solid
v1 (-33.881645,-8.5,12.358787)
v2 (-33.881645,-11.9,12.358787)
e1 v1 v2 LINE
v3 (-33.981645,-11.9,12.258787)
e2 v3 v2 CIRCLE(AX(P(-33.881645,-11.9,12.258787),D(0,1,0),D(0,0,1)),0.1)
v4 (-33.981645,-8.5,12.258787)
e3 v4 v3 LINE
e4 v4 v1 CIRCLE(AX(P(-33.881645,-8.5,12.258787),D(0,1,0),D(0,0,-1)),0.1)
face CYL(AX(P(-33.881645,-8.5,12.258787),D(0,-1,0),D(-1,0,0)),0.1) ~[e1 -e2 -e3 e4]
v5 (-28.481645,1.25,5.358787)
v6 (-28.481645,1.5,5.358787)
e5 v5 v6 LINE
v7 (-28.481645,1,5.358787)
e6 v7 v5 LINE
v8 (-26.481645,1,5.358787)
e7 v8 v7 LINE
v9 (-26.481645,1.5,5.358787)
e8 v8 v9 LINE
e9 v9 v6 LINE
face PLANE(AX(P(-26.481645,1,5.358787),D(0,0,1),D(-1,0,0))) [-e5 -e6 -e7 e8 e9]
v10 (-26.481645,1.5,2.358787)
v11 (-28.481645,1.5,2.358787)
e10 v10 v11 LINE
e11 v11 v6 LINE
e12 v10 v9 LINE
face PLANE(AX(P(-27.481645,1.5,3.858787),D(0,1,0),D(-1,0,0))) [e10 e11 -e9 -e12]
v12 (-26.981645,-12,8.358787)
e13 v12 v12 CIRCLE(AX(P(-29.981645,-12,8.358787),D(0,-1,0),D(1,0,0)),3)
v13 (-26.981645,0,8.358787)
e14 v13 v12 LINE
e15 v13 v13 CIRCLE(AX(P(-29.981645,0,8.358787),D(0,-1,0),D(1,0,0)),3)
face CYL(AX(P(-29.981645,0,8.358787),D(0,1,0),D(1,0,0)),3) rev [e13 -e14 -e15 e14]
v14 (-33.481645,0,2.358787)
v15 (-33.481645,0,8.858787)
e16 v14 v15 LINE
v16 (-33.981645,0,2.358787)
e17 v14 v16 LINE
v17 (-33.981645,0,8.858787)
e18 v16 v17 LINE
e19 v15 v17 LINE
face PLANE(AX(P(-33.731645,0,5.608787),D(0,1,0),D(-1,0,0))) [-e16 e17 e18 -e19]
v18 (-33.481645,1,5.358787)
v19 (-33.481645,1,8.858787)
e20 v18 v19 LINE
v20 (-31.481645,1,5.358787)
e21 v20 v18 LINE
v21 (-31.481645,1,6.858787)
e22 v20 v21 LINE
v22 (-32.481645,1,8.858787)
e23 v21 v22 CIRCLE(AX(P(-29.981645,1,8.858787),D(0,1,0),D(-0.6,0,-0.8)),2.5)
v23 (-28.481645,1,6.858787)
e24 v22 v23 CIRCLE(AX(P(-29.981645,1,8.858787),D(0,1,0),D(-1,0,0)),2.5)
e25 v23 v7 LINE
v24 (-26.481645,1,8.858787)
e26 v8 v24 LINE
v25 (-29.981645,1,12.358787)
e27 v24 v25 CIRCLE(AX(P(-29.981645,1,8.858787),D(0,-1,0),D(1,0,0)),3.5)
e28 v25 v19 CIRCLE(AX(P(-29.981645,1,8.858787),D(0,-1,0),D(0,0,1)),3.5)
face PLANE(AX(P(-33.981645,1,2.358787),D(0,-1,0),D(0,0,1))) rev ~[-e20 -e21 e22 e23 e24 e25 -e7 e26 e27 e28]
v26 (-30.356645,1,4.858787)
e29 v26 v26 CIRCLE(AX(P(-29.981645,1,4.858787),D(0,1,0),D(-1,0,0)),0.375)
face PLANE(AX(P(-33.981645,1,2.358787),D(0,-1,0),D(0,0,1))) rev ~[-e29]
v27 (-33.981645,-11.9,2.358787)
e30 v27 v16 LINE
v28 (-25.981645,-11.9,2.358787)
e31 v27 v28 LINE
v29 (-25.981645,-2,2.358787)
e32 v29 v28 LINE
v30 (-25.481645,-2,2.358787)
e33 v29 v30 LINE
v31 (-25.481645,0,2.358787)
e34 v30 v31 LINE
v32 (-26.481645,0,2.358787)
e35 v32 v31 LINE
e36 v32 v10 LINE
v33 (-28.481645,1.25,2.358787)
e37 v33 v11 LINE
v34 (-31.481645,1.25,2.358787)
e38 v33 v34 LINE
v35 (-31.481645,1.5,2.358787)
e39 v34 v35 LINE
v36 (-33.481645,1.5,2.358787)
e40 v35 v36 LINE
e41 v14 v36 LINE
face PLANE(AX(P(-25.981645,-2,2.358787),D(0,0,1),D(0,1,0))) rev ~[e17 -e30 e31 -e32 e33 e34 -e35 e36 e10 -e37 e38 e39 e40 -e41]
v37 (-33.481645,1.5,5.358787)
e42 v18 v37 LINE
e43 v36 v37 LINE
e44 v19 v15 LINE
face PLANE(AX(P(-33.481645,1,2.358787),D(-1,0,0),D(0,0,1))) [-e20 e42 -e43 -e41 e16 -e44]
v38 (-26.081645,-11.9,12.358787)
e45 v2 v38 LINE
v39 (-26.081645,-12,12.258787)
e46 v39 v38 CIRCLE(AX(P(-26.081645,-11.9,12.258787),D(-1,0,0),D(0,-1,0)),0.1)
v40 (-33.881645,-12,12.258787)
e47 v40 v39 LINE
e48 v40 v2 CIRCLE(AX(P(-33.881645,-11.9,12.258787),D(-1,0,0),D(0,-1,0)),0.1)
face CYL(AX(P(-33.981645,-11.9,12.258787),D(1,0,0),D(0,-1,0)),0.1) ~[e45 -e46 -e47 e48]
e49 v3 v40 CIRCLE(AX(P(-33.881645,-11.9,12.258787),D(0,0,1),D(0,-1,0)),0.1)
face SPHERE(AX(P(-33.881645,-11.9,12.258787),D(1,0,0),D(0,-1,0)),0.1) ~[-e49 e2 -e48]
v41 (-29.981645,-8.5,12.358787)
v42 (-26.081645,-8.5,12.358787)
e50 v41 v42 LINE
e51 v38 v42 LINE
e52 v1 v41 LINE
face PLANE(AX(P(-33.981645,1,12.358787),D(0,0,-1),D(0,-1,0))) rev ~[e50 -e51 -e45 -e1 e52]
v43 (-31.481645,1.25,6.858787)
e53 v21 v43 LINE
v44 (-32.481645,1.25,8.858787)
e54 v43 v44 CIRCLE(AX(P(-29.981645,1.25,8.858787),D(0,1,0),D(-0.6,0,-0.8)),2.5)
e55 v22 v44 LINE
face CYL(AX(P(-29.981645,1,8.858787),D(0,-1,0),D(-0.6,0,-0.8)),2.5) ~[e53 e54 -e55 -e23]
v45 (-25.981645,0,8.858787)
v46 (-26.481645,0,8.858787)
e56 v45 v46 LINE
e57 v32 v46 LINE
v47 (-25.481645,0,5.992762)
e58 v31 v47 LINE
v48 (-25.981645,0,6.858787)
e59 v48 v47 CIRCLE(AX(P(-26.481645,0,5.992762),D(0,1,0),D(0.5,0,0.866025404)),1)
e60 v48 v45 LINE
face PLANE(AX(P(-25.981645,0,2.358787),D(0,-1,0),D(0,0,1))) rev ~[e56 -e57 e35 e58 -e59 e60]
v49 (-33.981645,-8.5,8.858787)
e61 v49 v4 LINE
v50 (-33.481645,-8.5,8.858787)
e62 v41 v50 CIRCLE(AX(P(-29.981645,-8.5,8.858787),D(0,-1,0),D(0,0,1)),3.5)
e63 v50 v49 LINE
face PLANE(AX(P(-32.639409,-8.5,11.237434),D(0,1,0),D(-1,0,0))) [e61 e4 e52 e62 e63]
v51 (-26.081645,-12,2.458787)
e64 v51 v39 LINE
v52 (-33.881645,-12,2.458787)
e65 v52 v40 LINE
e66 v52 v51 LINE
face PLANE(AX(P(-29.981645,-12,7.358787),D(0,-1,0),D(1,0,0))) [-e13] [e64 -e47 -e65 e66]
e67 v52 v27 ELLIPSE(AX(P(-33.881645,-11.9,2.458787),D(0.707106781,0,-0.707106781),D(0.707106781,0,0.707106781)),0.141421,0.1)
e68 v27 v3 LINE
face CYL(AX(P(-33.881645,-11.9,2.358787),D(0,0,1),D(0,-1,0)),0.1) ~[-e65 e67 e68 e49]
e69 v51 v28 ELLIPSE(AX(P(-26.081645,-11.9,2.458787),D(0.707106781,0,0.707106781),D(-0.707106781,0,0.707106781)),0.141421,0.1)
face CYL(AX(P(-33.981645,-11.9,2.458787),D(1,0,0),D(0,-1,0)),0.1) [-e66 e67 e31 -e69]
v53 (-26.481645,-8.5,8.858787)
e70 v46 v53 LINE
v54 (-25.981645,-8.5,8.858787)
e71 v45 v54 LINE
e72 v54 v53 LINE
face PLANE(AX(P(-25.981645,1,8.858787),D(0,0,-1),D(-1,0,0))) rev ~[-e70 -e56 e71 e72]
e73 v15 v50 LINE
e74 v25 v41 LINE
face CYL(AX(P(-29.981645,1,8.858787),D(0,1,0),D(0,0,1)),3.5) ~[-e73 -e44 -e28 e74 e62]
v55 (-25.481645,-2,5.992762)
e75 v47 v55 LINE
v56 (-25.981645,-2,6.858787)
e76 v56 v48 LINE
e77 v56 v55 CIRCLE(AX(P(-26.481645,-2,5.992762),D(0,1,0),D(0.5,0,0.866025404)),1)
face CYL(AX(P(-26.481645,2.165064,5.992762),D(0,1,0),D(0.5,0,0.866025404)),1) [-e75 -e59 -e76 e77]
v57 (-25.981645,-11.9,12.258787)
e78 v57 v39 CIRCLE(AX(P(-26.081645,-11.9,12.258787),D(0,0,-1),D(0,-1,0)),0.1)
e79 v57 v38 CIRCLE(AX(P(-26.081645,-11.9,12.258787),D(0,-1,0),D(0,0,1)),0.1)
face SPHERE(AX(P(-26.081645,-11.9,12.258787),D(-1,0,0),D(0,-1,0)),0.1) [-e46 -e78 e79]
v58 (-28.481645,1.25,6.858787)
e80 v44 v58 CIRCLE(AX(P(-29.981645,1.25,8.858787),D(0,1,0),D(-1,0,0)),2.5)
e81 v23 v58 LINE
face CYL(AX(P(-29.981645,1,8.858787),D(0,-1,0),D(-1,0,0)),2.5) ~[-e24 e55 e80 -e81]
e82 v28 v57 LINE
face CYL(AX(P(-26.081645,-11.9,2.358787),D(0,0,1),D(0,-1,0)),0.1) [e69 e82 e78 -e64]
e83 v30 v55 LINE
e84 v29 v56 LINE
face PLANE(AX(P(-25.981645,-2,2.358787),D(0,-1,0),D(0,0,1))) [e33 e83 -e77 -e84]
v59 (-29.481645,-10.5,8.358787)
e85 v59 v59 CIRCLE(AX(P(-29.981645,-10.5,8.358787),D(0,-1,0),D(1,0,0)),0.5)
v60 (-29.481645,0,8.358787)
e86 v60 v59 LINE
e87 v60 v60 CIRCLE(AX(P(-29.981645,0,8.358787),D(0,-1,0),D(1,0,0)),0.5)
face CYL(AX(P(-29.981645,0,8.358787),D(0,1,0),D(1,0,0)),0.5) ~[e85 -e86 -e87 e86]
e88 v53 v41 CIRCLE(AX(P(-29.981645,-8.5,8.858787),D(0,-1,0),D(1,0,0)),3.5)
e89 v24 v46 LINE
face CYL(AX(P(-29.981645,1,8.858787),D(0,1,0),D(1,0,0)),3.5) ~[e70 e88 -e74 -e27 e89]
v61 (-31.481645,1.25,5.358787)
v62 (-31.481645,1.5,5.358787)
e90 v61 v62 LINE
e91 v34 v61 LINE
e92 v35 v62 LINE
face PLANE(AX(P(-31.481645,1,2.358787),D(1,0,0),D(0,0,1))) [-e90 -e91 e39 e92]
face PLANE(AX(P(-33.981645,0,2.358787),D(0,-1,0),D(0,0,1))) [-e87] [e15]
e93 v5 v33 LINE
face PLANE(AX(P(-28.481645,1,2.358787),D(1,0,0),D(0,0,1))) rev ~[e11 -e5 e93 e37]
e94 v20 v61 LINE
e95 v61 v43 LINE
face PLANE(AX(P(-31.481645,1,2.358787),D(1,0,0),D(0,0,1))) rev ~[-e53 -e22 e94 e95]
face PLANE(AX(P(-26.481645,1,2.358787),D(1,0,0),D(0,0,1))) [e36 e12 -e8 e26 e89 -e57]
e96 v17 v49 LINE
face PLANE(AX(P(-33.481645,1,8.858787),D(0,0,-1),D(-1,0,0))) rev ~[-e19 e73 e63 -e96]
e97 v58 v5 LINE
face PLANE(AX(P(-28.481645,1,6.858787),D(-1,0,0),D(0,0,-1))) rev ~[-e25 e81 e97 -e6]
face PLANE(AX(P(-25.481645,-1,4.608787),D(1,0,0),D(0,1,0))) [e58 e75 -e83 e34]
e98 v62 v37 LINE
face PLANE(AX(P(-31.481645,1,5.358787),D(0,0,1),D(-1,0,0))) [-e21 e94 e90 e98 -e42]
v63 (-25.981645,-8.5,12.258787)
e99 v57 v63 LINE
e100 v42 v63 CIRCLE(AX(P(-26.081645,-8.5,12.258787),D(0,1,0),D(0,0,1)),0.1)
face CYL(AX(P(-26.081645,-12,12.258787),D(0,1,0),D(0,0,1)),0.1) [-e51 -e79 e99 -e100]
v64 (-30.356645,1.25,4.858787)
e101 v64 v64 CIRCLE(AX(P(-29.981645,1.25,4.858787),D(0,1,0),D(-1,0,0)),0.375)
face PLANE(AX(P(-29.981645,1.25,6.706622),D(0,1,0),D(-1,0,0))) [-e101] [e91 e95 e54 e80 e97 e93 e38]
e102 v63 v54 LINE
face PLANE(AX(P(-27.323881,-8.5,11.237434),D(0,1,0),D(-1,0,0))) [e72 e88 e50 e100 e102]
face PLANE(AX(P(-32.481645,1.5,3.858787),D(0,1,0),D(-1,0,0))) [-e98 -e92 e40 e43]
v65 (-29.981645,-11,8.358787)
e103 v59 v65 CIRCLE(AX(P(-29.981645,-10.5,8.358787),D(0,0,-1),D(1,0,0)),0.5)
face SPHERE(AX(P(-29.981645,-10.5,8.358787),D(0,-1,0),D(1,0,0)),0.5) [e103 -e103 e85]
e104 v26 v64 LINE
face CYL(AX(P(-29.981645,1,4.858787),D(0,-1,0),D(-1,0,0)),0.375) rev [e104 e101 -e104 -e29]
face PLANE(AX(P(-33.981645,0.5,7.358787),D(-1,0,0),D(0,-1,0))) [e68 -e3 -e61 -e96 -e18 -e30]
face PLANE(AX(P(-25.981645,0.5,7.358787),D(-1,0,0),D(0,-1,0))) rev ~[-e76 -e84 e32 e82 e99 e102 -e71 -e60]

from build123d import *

# Parameters (mm, degrees)
F0_W         = 8
F0_H         = 10
F0_R         = 3
F1_DEPTH     = 12
F2_W         = 1
F2_H         = 10
F3_DEPTH     = 8
F5_DEPTH     = 9.5
F4_W         = 0.5
F4_H         = 6.5
F6_DEPTH     = 1
F7_R         = 0.5
F8_DEPTH     = 11
F9_R         = 0.5
F10_R        = 0.1
F11_W        = 2
F11_H        = 3
F12_DEPTH    = 0.5
F13_R        = 0.375
F14_DEPTH    = 0.25
F15_W        = 2
F15_H        = 4.5
F16_DEPTH    = 0.5
F17_T1_DEPTH = 6.3301270189


# Not quite as in the source:
# - a fillet or chamfer that OpenCascade refuses, or shapes differently, is made with other operations: its cross-section is extruded or revolved along the edge and cut away or added


with BuildPart() as f1:
    # F0 (on Front) → F1 (new body)
    with BuildSketch(Plane.XZ):
        with Locations((-29.9816446145, 7.3587873485)):
            Rectangle(F0_W, F0_H)
        with Locations((-29.9816446145, 8.3587873485)):
            Circle(F0_R, mode=Mode.SUBTRACT)
    extrude(amount=F1_DEPTH)

    # F2 (on face) → F3 (join, through all)
    with BuildSketch(Plane(origin=(-33.9816446145, 0, 0), x_dir=(0, -1, 0), z_dir=(-1, 0, 0))):
        with Locations((-0.5, 7.3587873485)):
            Rectangle(F2_W, F2_H)
    extrude(amount=-F3_DEPTH)

    # F4 (on face) → F5 (cut)
    with BuildSketch(Plane(origin=(0, 1, 0), x_dir=(-1, 0, 0), z_dir=(0, 1, 0))):
        with BuildLine():
            Line((33.9816446145, 12.3587873485), (29.9816446145, 12.3587873485))
            ThreePointArc((29.9816446145, 12.3587873485), (32.4565183487, 11.3336610826), (33.4816446145, 8.8587873485))
            Line((33.4816446145, 8.8587873485), (33.9816446145, 8.8587873485))
            Line((33.9816446145, 8.8587873485), (33.9816446145, 12.3587873485))
        make_face()
        with BuildLine():
            Line((29.9816446145, 12.3587873485), (25.9816446145, 12.3587873485))
            Line((25.9816446145, 12.3587873485), (25.9816446145, 8.8587873485))
            Line((25.9816446145, 8.8587873485), (26.4816446145, 8.8587873485))
            ThreePointArc((26.4816446145, 8.8587873485), (27.5067708804, 11.3336610826), (29.9816446145, 12.3587873485))
        make_face()
    extrude(amount=-F5_DEPTH, mode=Mode.SUBTRACT)

    # F4 (on face) → F6 (cut)
    with BuildSketch(Plane(origin=(0, 1, 0), x_dir=(-1, 0, 0), z_dir=(0, 1, 0))):
        with Locations((26.2316446145, 5.6087873485)):
            Rectangle(F4_W, F4_H)
        with Locations((33.7316446145, 5.6087873485)):
            Rectangle(F4_W, F4_H)
    extrude(amount=-F6_DEPTH, mode=Mode.SUBTRACT)

    # F7 (on face) → F8 (join)
    with BuildSketch(Plane.XZ):
        with Locations((-29.9816446145, 8.3587873485)):
            Circle(F7_R)
    extrude(amount=F8_DEPTH)

    # F9
    f9_edges = [f1.edges().sort_by_distance(p)[0] for p in [
        (-30.481645, -11, 8.358787),
    ]]
    fillet(f9_edges, radius=F9_R)

    # F10
    f10_edges = [f1.edges().sort_by_distance(p)[0] for p in [
        (-29.981645, -12, 12.358787),
        (-25.981645, -12, 7.358787),
        (-33.981645, -12, 7.358787),
        (-29.981645, -12, 2.358787),
        (-25.981645, -10.25, 12.358787),
        (-33.981645, -10.25, 12.358787),
    ]]
    fillet(f10_edges, radius=F10_R)

    # F11 (on face) → F12 (join)
    with BuildSketch(Plane(origin=(0, 1, 0), x_dir=(-1, 0, 0), z_dir=(0, 1, 0))):
        with Locations((27.4816446145, 3.8587873485)):
            Rectangle(F11_W, F11_H)
        with Locations((32.4816446145, 3.8587873485)):
            Rectangle(F11_W, F11_H)
    extrude(amount=F12_DEPTH)

    # F13 (on face) → F14 (join)
    with BuildSketch(Plane(origin=(0, 1, 0), x_dir=(-1, 0, 0), z_dir=(0, 1, 0))):
        with BuildLine():
            Line((31.4816446145, 6.8587873485), (28.4816446145, 6.8587873485))
            ThreePointArc((28.4816446145, 6.8587873485), (29.9816446145, 6.3587873485), (31.4816446145, 6.8587873485))
        make_face()
        with BuildLine():
            ThreePointArc((31.4816446145, 6.8587873485), (32.217712592, 7.7407533597), (32.4816446145, 8.8587873485))
            ThreePointArc((32.4816446145, 8.8587873485), (28.8636106257, 11.094855326), (28.4816446145, 6.8587873485))
            Line((28.4816446145, 6.8587873485), (31.4816446145, 6.8587873485))
        make_face()
        with BuildLine():
            ThreePointArc((31.4816446145, 6.8587873485), (29.9816446145, 6.3587873485), (28.4816446145, 6.8587873485))
            Line((28.4816446145, 6.8587873485), (28.4816446145, 5.3587873485))
            Line((28.4816446145, 5.3587873485), (28.4816446145, 2.3587873485))
            Line((28.4816446145, 2.3587873485), (31.4816446145, 2.3587873485))
            Line((31.4816446145, 2.3587873485), (31.4816446145, 5.3587873485))
            Line((31.4816446145, 5.3587873485), (31.4816446145, 6.8587873485))
        make_face()
        with Locations((29.9816446145, 4.8587873485)):
            Circle(F13_R, mode=Mode.SUBTRACT)
    extrude(amount=F14_DEPTH)

    # F15 (on face) → F16 (join)
    with BuildSketch(Plane.YZ.offset(-25.9816446145)):
        with Locations((-1, 4.6087873485)):
            Rectangle(F15_W, F15_H)
    extrude(amount=F16_DEPTH)

    # F17: fillet of radius 1 on 1 edges, made by hand

    # F17_s2 → F17_t1 (cut)
    with BuildSketch(Plane.XZ.offset(-2.1650635095)):
        with BuildLine():
            ThreePointArc((-25.9816446145, 6.8587873485), (-25.6156192107, 6.4927619447), (-25.4816446145, 5.9927619447))
            Line((-25.4816446145, 5.9927619447), (-25.4816446145, 6.8587873485))
            Line((-25.4816446145, 6.8587873485), (-25.9816446145, 6.8587873485))
        make_face()
    extrude(amount=F17_T1_DEPTH, mode=Mode.SUBTRACT)


solid = f1.part
